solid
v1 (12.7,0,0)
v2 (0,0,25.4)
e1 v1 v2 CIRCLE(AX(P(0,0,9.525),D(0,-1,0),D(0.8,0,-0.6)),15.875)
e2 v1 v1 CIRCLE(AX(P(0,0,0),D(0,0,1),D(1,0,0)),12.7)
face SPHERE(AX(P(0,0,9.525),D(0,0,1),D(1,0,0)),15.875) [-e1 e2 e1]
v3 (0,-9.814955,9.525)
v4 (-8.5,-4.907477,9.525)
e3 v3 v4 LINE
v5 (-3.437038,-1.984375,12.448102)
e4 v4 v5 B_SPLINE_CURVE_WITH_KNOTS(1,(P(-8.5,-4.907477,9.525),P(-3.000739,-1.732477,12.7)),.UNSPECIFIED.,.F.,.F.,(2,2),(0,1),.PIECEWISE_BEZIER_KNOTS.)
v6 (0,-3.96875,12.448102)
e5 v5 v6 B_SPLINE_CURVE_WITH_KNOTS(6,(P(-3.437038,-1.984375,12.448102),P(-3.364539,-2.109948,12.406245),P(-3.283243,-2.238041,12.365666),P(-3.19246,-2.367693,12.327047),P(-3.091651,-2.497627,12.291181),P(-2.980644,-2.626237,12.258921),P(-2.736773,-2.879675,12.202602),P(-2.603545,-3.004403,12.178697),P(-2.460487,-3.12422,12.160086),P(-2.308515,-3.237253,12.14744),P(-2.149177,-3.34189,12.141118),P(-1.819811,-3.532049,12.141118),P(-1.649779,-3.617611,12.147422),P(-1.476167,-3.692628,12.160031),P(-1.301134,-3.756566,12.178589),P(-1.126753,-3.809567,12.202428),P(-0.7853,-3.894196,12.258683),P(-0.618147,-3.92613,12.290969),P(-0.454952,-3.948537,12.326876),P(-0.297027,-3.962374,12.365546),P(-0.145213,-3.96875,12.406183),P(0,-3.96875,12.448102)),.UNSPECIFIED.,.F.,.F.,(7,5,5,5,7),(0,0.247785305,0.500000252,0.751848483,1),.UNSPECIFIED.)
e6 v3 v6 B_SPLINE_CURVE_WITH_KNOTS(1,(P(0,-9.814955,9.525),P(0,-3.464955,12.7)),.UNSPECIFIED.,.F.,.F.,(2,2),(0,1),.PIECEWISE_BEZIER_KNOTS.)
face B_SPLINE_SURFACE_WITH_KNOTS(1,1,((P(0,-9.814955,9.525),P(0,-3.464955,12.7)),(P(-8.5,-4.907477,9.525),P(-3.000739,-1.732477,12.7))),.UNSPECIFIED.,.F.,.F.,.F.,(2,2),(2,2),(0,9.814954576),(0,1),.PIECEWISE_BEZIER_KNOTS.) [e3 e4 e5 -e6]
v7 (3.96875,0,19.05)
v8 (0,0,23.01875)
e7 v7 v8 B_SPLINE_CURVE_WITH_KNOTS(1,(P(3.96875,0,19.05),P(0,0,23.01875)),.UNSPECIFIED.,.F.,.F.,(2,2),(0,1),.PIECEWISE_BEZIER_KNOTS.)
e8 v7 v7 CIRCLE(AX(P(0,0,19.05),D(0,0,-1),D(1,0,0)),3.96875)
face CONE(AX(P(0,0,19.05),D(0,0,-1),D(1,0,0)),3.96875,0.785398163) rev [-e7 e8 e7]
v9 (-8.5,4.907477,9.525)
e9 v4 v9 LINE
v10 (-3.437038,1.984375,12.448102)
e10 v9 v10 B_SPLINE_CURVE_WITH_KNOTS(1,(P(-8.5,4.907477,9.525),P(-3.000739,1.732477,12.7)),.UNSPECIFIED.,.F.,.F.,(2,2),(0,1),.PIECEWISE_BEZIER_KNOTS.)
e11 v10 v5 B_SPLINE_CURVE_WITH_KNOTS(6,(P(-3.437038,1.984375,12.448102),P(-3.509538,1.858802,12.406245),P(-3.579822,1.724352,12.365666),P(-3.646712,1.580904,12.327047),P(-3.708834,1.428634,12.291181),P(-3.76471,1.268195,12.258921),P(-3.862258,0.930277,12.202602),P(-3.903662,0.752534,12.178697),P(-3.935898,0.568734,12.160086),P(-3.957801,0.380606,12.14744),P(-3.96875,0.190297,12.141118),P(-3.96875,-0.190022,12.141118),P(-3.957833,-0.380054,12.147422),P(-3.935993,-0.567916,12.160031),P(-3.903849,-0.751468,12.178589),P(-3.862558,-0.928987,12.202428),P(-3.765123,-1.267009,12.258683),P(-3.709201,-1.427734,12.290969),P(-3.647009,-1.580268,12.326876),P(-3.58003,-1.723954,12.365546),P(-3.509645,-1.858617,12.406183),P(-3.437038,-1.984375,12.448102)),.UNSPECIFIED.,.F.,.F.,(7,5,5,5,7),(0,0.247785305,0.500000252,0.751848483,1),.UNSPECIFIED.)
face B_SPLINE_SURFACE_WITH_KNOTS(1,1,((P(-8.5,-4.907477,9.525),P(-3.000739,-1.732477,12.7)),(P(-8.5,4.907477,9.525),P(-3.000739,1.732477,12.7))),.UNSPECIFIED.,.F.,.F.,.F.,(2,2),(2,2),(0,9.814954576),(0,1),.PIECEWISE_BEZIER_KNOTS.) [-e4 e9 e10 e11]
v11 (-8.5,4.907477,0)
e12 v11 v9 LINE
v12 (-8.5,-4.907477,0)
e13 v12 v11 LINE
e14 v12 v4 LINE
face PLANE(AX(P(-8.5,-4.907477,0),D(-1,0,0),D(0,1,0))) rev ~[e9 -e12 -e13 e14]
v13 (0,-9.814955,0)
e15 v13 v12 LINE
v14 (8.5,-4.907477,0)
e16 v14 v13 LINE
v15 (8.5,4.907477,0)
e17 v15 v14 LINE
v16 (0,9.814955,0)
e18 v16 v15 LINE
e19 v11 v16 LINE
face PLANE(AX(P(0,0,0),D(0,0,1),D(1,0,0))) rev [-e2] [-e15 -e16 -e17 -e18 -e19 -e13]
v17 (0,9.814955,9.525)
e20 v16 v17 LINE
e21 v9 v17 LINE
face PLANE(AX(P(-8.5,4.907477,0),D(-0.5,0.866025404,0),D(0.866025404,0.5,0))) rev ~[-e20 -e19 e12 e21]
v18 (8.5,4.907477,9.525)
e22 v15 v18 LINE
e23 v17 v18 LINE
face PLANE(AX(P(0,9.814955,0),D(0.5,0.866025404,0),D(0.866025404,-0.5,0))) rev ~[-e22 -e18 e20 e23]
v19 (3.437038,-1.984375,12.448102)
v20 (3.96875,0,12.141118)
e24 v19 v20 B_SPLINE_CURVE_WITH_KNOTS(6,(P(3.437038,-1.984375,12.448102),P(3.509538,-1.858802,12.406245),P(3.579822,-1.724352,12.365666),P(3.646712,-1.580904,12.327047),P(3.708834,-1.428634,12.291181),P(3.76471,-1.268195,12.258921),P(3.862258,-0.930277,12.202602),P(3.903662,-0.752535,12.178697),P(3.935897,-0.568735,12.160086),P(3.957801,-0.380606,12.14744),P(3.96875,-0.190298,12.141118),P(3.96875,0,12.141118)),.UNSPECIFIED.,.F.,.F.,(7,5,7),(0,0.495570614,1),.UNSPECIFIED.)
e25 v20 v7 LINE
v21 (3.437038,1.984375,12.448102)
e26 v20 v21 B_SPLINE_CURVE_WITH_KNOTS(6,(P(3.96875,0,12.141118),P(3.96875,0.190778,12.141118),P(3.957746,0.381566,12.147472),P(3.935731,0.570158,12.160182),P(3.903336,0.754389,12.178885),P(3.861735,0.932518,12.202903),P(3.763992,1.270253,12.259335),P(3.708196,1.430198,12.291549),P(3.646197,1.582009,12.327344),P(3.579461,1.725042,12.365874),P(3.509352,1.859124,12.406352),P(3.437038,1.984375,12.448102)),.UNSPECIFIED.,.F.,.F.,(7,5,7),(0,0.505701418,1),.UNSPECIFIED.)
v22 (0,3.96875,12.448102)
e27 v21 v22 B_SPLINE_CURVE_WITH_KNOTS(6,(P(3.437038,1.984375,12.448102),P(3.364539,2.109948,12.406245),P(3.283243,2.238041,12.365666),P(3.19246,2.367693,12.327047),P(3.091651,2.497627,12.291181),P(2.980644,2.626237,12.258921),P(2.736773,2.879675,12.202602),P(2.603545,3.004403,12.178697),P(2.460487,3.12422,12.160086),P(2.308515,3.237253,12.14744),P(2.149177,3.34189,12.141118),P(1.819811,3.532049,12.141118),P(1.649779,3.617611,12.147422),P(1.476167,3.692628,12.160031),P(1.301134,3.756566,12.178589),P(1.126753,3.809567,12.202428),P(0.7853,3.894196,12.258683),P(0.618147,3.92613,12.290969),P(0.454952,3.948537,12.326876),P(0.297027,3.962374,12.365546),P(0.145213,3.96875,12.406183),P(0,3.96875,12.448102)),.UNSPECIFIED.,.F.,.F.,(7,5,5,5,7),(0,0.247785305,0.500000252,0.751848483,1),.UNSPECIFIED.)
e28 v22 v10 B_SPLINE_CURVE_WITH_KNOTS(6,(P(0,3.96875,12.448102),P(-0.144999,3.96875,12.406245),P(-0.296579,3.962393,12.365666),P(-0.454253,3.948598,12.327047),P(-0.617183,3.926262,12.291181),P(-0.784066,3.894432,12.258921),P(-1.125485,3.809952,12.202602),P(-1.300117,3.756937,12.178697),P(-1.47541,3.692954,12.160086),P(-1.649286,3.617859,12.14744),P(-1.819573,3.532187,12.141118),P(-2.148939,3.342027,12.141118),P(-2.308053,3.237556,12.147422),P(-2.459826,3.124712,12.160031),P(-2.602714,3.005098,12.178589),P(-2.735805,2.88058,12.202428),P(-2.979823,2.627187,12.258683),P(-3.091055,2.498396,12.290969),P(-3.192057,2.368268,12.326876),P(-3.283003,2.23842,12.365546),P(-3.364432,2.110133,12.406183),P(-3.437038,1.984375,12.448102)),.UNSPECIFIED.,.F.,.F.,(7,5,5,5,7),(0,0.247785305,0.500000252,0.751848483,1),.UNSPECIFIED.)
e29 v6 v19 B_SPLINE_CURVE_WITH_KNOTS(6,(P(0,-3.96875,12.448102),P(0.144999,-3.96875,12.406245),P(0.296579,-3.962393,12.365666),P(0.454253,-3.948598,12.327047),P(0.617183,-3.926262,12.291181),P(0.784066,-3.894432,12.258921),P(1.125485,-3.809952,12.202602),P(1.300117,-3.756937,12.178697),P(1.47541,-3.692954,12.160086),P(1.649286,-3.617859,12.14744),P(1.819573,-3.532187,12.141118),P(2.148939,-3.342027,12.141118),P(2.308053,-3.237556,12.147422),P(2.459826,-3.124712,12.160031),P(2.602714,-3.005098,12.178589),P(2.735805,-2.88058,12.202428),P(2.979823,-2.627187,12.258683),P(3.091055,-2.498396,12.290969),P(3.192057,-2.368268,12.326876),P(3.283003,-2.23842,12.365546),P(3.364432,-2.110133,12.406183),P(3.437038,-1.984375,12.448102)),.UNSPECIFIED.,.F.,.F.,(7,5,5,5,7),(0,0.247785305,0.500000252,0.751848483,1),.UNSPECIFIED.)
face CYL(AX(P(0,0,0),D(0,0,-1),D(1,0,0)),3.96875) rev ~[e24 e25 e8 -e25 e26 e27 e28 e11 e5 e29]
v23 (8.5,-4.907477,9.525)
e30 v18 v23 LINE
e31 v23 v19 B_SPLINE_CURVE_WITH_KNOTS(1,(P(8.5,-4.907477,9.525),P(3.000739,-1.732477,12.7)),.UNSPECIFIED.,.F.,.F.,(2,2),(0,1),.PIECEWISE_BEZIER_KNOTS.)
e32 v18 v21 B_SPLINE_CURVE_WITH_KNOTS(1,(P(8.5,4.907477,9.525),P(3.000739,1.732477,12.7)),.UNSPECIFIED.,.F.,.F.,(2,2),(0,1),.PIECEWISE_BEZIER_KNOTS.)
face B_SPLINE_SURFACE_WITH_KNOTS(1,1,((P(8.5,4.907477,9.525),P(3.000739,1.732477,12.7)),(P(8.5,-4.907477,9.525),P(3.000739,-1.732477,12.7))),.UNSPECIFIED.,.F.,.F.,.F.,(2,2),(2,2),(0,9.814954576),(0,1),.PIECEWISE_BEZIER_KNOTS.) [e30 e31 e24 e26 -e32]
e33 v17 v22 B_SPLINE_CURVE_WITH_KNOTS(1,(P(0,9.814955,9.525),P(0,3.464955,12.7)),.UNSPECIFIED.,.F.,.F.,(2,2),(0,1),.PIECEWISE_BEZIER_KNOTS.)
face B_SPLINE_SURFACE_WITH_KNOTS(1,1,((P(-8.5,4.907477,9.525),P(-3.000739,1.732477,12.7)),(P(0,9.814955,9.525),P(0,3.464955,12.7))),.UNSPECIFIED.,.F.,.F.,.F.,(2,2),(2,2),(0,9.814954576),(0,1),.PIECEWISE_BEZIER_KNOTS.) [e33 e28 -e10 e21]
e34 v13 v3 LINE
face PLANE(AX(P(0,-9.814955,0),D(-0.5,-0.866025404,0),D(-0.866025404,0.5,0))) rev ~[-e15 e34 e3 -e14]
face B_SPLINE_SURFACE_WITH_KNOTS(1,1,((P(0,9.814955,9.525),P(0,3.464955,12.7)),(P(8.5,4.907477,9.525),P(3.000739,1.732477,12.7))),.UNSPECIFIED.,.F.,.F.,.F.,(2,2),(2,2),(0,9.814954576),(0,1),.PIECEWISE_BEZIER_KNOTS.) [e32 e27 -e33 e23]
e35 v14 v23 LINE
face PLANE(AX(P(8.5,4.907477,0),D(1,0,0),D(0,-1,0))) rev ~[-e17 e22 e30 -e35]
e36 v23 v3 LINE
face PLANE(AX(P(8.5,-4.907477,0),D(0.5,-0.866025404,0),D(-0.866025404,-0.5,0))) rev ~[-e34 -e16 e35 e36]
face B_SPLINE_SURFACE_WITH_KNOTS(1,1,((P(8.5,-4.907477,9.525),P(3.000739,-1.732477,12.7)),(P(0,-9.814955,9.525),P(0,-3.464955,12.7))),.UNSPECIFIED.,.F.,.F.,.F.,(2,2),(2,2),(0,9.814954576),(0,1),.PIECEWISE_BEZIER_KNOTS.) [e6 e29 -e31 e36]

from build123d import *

# Parameters (mm, degrees)
F2_R      = 3.96875
F3_DEPTH  = 19.05
F3_FACE_R = 3.96875
F5_R      = 3.96875
F6_DEPTH  = 9.525
F7_R      = 3.96875
F8_DEPTH  = 3.175
F8_TAPER  = 60


# Not quite as in the source:
# - an extrude whose draft closes it to a point is written as a loft to that point


with BuildPart() as f1:
    # F0 (on Front) → F1 (revolve)
    with BuildSketch(Plane.XZ):
        with BuildLine():
            Line((0, 0), (12.7, 0))
            ThreePointArc((12.7, 0), (14.1990316571, 16.6245158286), (0, 25.4))
            Line((0, 25.4), (0, 0))
        make_face()
    revolve(axis=Axis((0, 0, 12.7), (0, 0, 1)))

    # F2 (on face) → F3 (cut)
    with BuildSketch(Plane(origin=(0, 0, 0), x_dir=(1, 0, 0), z_dir=(0, 0, -1))):
        Circle(F2_R)
    extrude(amount=-F3_DEPTH, mode=Mode.SUBTRACT)

    # F3_face (on face) → F4 section 0
    with BuildSketch(Plane(origin=(0, 0, 19.05), x_dir=(1, 0, 0), z_dir=(0, 0, -1)), mode=Mode.PRIVATE) as f4_s0:
        Circle(F3_FACE_R)
    loft([f4_s0.sketch, Vertex(0, 0, 23.01875)], ruled=True, mode=Mode.SUBTRACT)

    # F5 (on face) → F6 (cut)
    with BuildSketch(Plane(origin=(0, 0, 0), x_dir=(1, 0, 0), z_dir=(0, 0, -1))):
        Polygon((-8.5, 4.9074772881), (-8.5, -4.9074772881), (0, -9.8149545762), (8.5, -4.9074772881), (8.5, 4.9074772881), (0, 9.8149545762), align=None)
        Circle(F5_R, mode=Mode.SUBTRACT)
    extrude(amount=-F6_DEPTH, mode=Mode.SUBTRACT)

    # F7 (on face) → F8 (cut)
    with BuildSketch(Plane(origin=(0, 0, 9.525), x_dir=(1, 0, 0), z_dir=(0, 0, -1))):
        Polygon((8.5, 4.9074772881), (0, 9.8149545762), (-8.5, 4.9074772881), (-8.5, -4.9074772881), (0, -9.8149545762), (8.5, -4.9074772881), align=None)
        Circle(F7_R, mode=Mode.SUBTRACT)
        Circle(F7_R)
    extrude(amount=-F8_DEPTH, taper=F8_TAPER, mode=Mode.SUBTRACT)


solid = f1.part
